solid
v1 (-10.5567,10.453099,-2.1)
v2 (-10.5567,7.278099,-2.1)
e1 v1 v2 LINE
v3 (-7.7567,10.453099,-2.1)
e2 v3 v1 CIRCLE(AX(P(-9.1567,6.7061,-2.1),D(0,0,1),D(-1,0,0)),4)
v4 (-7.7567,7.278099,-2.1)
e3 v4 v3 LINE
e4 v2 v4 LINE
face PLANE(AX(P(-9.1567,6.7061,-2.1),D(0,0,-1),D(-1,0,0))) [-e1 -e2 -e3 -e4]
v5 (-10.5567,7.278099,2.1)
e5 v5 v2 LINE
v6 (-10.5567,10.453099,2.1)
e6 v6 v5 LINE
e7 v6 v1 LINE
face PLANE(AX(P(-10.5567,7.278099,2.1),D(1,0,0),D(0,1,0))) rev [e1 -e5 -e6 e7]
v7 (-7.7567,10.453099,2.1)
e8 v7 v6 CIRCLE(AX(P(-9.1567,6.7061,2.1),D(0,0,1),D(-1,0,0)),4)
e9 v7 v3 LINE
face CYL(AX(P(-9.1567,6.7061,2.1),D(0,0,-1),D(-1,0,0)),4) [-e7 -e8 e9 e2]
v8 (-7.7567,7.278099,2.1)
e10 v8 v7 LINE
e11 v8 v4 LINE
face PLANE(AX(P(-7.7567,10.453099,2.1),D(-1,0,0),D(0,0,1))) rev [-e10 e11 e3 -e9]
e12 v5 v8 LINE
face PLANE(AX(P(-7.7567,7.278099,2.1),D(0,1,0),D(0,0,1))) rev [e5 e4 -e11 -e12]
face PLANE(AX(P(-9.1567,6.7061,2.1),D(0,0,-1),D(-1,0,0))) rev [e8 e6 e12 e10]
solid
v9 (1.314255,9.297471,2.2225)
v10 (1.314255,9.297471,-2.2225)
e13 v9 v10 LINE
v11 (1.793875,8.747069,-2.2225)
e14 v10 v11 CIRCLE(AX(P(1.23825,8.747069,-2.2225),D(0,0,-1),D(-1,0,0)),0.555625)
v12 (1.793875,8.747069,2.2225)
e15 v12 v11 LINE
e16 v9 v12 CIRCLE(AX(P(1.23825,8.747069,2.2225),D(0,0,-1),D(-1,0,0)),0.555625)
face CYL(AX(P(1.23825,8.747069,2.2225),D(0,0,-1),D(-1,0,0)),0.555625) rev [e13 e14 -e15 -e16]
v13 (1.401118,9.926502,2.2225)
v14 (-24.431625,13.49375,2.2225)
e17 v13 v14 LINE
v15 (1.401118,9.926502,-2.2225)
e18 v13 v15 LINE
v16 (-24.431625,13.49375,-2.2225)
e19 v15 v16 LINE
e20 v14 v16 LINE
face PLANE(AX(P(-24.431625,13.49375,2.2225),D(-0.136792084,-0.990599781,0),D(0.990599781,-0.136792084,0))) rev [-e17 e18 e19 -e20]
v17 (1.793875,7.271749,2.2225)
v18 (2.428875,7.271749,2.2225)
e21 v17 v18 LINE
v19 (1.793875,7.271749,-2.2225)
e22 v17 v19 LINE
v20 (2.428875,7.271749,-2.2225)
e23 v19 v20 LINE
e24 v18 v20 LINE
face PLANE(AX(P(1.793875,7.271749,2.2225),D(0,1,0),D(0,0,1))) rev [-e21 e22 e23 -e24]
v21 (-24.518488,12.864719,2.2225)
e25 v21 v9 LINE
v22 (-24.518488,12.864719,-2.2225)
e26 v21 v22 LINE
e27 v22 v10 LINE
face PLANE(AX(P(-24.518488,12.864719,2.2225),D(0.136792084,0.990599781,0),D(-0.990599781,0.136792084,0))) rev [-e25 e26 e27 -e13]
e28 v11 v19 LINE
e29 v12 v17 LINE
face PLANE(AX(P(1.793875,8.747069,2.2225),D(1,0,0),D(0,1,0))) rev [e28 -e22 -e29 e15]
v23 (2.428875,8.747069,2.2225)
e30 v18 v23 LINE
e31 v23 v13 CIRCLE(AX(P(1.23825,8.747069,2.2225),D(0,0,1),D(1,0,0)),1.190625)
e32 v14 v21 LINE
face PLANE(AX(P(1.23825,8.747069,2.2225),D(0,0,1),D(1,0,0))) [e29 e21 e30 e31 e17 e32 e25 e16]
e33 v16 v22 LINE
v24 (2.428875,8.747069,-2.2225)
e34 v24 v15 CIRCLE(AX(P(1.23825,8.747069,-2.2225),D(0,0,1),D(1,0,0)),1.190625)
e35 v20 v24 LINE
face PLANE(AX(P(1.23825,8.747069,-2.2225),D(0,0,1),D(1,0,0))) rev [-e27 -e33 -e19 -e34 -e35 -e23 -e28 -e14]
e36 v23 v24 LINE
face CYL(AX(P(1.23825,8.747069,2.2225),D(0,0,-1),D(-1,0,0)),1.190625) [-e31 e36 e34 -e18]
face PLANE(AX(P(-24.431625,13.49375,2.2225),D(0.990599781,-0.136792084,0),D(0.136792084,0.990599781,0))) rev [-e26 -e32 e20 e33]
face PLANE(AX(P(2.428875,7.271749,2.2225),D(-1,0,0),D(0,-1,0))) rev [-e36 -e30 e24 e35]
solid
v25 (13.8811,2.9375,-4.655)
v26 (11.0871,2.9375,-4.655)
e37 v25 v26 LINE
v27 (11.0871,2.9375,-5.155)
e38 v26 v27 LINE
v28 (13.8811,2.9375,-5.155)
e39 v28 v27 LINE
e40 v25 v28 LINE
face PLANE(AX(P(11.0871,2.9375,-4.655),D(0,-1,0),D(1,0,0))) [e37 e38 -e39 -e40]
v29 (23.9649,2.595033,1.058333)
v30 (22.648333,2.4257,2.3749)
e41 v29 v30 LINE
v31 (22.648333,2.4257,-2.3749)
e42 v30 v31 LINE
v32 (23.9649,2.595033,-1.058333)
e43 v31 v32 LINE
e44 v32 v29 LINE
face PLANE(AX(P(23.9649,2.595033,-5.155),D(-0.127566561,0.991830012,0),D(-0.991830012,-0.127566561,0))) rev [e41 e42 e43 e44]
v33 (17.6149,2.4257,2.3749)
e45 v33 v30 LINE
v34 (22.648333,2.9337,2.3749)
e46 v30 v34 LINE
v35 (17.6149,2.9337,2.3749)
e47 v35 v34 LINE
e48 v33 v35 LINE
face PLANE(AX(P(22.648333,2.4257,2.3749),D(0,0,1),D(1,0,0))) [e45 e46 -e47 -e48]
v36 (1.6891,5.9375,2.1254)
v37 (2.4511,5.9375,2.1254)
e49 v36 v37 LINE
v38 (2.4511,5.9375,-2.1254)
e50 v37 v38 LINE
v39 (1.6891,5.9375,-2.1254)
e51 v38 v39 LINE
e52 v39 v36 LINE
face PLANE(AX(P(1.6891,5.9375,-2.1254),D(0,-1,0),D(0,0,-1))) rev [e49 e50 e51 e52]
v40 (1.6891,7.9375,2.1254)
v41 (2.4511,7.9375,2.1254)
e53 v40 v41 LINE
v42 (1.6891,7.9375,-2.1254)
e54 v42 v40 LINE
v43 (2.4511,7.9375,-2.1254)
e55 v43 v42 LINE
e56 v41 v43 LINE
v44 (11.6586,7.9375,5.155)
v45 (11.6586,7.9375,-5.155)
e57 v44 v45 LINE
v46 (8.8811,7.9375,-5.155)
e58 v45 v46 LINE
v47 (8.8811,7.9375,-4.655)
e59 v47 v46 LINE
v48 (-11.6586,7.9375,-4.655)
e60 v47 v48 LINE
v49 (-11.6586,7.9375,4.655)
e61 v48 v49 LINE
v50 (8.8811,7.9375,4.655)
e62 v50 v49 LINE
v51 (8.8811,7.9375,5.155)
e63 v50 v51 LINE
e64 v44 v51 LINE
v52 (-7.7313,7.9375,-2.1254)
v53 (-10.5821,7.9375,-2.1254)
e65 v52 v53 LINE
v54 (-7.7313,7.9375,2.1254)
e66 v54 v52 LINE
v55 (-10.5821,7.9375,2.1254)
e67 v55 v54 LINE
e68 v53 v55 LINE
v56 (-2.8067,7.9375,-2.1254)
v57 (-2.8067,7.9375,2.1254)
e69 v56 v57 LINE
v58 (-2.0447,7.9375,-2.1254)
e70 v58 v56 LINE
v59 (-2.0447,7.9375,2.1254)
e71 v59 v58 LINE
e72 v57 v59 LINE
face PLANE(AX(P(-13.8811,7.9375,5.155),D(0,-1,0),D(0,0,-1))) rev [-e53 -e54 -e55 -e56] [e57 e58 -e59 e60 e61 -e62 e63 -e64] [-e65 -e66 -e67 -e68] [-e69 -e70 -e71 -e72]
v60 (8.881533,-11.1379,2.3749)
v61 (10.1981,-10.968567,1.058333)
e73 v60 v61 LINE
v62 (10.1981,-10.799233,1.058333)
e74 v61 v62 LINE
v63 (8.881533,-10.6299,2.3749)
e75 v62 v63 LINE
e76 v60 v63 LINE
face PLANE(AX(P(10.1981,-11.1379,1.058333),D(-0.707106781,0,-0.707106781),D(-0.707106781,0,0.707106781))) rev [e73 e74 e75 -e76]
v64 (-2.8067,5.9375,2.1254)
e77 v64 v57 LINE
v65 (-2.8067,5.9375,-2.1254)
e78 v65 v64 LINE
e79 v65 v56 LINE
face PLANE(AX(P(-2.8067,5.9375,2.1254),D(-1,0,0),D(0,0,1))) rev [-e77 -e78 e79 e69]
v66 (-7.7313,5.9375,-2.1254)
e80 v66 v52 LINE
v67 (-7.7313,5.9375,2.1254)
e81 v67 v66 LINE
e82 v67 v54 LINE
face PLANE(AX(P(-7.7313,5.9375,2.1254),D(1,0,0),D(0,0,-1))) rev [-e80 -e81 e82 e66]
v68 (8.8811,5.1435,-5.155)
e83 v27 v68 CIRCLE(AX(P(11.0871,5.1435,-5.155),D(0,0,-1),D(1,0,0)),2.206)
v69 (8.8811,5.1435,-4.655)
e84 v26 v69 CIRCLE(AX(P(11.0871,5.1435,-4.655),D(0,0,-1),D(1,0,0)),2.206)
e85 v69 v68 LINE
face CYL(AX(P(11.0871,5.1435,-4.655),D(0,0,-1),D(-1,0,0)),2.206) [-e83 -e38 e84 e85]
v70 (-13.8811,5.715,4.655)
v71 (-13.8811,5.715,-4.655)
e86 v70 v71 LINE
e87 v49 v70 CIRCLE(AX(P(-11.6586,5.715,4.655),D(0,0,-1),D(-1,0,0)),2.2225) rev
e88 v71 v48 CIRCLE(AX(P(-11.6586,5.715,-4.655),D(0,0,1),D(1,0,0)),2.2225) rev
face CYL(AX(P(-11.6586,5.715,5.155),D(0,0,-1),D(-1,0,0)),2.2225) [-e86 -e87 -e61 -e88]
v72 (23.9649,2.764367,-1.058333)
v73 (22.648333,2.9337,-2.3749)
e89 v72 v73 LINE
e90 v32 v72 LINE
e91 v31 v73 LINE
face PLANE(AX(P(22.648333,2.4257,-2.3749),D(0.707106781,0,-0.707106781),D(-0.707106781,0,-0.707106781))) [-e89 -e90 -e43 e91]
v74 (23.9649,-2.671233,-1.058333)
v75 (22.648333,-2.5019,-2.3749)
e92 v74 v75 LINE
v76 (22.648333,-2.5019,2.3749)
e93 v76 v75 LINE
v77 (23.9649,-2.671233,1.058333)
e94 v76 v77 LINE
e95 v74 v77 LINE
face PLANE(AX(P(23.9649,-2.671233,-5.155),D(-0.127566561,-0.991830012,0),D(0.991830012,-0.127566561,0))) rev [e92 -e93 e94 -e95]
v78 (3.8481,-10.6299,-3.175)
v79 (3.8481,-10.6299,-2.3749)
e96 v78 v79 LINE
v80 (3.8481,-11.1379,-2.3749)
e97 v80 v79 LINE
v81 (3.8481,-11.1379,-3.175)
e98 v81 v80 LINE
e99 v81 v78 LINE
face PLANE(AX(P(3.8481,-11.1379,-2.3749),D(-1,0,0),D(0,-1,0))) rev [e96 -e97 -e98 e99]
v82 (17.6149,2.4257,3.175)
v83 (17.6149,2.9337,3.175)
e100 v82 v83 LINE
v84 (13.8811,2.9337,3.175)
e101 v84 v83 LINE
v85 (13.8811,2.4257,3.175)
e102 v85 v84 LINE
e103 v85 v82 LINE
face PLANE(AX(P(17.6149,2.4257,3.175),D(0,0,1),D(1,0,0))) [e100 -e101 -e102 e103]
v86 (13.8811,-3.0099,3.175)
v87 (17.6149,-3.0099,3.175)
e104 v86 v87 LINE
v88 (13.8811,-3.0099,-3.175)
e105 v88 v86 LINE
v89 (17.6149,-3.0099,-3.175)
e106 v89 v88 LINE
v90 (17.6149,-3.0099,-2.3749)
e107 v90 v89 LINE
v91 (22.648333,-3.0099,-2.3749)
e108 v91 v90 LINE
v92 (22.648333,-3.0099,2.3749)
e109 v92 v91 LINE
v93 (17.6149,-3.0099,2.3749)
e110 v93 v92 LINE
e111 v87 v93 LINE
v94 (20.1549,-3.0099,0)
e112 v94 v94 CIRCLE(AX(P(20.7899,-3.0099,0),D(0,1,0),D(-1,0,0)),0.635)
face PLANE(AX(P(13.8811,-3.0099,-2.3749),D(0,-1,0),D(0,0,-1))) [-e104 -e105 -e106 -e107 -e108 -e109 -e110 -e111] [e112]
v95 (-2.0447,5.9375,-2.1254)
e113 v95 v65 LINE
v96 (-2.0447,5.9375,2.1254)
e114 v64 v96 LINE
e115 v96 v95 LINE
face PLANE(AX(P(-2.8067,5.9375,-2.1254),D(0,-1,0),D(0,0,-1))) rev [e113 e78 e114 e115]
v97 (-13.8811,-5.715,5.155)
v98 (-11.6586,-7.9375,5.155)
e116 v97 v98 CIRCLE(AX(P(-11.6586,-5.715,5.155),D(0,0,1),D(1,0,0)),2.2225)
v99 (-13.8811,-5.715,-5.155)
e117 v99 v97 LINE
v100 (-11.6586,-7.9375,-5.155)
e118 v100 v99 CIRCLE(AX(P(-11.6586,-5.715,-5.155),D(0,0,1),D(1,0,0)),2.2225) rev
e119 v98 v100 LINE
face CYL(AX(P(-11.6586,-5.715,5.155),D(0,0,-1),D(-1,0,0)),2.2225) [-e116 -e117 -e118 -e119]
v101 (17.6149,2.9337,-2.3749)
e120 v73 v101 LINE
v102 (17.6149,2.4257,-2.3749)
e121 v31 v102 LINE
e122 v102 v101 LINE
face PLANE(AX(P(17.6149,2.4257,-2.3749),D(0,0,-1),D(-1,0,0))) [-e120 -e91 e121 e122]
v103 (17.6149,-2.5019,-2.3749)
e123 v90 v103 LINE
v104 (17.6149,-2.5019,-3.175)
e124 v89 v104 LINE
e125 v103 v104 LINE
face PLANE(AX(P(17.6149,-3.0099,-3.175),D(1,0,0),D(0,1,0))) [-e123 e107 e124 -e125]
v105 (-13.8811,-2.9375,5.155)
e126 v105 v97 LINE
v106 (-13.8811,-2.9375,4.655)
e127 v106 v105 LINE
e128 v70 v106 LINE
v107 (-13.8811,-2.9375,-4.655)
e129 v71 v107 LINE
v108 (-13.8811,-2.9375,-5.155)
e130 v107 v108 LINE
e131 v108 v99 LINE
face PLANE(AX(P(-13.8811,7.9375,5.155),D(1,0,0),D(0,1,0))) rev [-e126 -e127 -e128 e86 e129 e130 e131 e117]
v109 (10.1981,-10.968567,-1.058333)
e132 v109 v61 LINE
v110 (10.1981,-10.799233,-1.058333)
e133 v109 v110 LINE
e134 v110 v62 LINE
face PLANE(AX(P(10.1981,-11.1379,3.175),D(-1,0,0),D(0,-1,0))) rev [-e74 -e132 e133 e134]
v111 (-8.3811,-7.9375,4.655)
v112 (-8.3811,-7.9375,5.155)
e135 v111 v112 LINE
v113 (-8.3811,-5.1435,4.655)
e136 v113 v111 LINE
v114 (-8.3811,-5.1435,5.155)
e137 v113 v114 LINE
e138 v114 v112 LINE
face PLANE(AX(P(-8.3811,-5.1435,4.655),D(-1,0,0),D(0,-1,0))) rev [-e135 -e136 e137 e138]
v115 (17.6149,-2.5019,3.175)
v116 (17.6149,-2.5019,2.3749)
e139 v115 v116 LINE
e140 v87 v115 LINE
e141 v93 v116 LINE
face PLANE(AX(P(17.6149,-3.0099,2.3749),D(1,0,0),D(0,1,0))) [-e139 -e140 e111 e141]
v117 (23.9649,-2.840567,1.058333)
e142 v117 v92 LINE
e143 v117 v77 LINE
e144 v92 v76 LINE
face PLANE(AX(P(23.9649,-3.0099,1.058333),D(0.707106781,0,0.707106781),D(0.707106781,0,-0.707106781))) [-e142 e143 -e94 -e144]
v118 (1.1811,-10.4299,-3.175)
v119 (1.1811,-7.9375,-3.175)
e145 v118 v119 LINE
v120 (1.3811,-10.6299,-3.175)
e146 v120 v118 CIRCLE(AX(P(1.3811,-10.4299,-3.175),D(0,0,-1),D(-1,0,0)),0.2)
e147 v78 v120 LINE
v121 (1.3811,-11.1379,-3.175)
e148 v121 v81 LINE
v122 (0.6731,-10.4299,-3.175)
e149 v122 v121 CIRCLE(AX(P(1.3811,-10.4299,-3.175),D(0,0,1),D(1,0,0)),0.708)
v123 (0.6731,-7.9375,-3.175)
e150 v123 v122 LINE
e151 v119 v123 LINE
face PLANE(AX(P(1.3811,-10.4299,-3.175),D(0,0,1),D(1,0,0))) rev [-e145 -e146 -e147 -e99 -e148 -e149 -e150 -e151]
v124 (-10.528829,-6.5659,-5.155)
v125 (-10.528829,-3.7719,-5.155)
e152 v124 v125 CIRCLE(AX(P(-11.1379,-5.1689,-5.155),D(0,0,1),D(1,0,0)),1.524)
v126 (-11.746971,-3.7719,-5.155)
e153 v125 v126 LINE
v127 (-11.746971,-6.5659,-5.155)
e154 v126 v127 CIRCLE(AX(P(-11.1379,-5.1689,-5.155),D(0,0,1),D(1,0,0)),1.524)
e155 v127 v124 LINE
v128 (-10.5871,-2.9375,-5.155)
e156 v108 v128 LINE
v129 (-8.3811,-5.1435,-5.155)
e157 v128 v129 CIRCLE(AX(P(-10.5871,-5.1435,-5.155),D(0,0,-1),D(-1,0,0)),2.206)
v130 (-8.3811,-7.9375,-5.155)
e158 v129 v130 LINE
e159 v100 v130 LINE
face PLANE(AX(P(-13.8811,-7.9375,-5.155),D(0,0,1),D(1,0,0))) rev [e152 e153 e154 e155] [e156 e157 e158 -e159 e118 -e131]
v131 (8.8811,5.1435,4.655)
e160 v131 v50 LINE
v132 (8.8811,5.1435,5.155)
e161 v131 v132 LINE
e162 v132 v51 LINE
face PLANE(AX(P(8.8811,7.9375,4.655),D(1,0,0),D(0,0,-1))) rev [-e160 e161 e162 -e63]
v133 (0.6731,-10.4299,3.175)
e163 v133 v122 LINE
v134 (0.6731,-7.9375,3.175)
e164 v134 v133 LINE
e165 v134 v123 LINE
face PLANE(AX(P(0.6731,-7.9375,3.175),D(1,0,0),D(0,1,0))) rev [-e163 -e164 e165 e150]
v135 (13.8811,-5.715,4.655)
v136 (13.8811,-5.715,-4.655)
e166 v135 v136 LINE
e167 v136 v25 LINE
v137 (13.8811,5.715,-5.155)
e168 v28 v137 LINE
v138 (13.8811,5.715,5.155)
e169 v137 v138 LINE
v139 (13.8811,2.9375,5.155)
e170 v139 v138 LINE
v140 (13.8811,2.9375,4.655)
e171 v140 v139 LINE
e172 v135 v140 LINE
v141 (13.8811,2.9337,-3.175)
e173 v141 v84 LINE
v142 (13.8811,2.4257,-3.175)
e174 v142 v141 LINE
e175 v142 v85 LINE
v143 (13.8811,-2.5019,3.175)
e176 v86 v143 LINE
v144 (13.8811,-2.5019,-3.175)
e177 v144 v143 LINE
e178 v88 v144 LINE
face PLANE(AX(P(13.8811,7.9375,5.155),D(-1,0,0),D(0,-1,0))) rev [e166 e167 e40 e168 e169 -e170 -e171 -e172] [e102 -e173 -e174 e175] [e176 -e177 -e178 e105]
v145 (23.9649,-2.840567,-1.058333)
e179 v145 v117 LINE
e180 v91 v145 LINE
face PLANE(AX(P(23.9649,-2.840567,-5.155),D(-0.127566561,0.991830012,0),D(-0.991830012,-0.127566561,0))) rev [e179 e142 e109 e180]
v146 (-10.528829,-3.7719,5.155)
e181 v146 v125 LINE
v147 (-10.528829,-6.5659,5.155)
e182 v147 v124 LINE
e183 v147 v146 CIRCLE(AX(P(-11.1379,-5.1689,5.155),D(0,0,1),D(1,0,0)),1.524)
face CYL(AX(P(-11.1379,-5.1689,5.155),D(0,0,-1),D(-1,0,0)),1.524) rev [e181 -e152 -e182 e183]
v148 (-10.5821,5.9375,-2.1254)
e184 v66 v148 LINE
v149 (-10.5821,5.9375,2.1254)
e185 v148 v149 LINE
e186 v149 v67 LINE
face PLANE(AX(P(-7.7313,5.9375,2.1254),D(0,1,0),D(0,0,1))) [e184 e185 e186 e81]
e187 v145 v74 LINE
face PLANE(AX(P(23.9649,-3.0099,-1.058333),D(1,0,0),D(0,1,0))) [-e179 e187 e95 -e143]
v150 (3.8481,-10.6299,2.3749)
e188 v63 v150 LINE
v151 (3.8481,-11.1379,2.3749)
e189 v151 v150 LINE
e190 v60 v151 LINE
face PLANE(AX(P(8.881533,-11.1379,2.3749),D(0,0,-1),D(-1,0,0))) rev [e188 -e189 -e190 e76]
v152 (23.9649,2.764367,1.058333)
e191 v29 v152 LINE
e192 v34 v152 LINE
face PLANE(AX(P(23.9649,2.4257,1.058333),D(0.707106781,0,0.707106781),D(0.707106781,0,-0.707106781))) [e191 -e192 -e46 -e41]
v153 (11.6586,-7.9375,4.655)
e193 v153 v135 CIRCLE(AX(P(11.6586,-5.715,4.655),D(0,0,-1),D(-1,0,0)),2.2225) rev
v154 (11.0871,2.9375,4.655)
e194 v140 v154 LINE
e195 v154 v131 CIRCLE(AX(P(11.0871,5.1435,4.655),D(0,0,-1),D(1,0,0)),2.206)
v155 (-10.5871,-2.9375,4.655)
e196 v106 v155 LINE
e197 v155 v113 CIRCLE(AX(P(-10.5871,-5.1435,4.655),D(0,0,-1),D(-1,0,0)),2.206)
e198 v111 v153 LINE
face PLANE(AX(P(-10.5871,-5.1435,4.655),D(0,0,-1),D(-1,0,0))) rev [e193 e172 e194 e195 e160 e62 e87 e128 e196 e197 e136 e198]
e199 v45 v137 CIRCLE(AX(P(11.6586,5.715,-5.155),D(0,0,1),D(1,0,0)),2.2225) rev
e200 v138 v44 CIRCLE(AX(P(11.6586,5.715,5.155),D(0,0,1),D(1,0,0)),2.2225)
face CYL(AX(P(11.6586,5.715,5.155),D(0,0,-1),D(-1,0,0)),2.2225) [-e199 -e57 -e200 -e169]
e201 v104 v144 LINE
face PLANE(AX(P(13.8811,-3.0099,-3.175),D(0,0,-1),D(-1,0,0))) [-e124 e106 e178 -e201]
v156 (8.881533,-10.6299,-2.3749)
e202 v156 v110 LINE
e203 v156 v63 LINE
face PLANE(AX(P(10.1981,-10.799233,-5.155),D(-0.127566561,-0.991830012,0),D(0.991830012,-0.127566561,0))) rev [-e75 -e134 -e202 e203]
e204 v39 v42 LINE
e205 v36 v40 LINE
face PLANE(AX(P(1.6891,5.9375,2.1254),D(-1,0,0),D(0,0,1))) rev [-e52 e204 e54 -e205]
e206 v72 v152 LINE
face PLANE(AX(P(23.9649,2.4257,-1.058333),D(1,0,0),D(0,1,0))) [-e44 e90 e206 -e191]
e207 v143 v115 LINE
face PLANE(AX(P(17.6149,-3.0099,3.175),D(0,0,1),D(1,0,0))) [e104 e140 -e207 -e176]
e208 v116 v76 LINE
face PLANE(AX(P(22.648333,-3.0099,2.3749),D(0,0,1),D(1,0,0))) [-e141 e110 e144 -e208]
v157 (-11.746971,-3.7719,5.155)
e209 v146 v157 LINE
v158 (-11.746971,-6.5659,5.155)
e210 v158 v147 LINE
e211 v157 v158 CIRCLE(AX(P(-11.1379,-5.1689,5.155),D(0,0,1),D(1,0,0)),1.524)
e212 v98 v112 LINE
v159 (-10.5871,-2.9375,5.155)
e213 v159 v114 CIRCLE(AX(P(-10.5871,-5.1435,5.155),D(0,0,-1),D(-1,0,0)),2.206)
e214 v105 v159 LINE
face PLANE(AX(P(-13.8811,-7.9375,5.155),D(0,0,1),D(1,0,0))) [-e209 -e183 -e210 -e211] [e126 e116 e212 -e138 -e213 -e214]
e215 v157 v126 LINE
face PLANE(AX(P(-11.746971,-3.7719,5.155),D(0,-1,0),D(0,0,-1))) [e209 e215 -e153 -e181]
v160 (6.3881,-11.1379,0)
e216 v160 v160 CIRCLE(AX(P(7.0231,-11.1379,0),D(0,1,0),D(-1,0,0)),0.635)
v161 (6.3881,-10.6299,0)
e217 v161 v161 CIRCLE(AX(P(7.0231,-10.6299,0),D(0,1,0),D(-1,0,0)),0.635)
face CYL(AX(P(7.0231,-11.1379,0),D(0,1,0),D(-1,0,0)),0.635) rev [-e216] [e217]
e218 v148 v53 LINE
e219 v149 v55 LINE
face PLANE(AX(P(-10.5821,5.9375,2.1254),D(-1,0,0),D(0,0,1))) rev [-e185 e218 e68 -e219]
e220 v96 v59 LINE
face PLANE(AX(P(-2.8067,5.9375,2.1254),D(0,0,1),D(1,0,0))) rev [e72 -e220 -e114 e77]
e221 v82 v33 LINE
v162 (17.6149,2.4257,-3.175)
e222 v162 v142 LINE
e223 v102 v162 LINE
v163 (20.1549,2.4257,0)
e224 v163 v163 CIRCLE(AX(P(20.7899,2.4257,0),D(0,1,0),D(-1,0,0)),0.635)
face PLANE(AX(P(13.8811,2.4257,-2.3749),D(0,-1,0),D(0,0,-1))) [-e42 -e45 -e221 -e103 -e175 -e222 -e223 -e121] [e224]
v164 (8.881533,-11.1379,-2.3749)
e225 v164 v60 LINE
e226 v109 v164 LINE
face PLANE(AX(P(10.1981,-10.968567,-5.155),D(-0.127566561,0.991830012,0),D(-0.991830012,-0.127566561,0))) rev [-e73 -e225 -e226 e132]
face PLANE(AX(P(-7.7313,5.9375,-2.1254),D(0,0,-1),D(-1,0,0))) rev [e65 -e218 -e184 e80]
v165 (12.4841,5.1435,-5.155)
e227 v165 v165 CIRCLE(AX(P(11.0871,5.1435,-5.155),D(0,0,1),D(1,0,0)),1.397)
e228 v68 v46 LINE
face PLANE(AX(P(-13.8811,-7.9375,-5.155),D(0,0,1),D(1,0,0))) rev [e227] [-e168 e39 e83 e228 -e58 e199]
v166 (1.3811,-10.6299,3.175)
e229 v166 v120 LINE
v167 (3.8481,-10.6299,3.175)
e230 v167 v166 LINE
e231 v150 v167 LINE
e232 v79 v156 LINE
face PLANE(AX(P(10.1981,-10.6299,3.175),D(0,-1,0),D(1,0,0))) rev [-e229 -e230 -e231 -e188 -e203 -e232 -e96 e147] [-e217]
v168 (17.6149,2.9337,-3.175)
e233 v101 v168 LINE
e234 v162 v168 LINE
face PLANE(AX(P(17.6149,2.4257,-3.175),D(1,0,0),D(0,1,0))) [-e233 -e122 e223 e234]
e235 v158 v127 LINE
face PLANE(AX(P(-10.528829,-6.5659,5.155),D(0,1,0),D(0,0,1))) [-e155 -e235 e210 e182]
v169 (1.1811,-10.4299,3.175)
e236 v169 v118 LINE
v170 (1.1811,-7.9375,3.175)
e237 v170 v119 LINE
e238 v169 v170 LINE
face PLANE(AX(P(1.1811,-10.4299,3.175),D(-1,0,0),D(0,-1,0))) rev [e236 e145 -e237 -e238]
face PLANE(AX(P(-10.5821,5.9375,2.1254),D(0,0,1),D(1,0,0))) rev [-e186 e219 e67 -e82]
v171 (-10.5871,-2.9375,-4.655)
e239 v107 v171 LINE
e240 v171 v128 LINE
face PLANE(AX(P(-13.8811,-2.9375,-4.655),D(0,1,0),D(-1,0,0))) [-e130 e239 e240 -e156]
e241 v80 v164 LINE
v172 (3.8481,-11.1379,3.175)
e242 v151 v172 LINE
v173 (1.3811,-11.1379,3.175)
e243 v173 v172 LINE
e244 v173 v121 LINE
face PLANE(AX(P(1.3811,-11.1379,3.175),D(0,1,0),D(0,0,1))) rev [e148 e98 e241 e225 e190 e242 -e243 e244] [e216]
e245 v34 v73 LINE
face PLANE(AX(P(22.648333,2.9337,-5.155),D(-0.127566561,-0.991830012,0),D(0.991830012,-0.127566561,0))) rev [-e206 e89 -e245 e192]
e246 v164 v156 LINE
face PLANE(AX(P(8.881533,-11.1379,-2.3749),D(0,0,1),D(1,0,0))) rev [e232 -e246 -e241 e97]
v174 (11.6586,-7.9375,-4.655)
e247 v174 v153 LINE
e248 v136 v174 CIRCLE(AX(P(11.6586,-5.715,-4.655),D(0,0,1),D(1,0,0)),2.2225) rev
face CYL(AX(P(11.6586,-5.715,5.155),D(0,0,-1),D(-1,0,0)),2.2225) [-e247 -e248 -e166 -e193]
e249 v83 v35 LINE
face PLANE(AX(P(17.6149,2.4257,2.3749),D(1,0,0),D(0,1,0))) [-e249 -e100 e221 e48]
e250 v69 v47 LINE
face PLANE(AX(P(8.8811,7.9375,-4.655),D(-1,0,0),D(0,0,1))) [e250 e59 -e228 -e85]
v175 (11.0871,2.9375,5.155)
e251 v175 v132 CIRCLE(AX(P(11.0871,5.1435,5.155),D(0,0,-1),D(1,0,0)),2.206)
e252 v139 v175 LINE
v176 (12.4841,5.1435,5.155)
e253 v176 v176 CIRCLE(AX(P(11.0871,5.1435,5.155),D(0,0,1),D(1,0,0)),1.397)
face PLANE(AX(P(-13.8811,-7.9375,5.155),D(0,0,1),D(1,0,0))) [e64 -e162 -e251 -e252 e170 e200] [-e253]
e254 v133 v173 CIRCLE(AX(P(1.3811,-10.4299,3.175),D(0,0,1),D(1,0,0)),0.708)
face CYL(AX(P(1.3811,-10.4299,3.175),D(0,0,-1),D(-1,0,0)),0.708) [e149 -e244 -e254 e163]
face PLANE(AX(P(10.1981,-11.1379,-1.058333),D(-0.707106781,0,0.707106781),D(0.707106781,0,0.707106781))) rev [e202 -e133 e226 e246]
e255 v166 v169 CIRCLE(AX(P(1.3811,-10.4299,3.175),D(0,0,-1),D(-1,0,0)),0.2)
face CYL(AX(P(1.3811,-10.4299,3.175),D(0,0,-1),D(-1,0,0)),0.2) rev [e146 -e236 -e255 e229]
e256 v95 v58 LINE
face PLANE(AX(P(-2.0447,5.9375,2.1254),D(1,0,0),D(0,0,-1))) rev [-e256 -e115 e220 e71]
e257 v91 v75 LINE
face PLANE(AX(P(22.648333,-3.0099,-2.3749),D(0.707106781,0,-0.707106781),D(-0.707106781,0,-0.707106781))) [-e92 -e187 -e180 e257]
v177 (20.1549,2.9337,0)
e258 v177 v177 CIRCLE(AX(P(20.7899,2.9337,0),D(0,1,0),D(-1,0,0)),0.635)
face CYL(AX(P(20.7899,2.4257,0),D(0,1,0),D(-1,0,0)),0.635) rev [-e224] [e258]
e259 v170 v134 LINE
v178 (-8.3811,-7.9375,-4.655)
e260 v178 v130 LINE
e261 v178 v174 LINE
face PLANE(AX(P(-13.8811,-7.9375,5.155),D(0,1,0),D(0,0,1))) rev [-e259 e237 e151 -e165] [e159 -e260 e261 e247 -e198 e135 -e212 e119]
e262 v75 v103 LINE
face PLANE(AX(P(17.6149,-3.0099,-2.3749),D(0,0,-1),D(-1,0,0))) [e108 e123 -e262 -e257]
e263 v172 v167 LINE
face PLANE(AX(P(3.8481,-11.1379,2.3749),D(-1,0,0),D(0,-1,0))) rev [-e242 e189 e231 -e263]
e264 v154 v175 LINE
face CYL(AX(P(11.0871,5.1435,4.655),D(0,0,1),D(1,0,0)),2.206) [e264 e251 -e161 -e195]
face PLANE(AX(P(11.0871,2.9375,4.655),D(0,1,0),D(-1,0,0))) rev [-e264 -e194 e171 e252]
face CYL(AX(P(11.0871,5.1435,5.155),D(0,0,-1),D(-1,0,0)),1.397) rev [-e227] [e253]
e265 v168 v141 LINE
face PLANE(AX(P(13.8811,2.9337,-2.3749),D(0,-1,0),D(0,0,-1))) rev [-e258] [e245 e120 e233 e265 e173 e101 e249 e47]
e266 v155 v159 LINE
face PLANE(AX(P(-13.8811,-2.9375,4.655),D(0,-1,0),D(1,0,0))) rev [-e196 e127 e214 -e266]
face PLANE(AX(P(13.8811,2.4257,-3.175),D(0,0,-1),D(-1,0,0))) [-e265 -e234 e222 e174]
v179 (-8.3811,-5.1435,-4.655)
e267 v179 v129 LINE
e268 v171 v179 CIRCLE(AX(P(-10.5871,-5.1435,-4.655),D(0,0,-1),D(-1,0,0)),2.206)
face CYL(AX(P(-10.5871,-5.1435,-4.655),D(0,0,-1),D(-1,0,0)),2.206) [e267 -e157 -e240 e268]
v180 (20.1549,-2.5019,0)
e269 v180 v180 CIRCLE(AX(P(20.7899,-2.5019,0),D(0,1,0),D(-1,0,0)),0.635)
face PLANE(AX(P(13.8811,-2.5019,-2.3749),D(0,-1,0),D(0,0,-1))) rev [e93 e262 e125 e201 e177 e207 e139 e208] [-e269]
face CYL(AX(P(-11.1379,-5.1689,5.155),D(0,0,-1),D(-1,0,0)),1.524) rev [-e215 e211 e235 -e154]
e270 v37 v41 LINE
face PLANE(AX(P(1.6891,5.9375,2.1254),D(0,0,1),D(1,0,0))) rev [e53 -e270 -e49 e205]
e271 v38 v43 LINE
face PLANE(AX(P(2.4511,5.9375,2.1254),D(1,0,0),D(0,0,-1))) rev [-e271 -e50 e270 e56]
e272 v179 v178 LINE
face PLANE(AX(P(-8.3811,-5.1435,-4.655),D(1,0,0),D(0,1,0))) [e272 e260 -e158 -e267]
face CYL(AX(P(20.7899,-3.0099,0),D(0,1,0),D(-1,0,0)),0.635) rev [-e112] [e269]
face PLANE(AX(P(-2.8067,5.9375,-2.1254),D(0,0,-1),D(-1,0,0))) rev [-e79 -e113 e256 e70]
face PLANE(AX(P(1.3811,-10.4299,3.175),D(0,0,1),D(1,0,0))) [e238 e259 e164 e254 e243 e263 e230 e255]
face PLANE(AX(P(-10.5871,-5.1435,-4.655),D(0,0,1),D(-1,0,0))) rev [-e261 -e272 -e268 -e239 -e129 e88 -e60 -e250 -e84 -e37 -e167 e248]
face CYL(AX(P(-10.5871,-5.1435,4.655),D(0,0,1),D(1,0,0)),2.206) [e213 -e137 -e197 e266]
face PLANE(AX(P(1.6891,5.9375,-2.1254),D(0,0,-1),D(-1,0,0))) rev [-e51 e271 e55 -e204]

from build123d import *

# Parameters (mm, degrees)
SKETCH1_W               = 27.7622
SKETCH1_H               = 15.875
SKETCH1_R               = 1.397
EXTRUDE1_DEPTH          = 5.155
FILLET1_R               = 2.2225
EXTRUDE2_DEPTH          = 2.1
SKETCH3_W               = 2.8508
SKETCH3_H               = 4.2508
SKETCH3_W_2             = 0.762
CUT_EXTRUDE1_DEPTH      = 2
CUT_EXTRUDE2_DEPTH      = 0.5
EXTRUDE3_DEPTH          = 3.175
SKETCH6_R               = 0.635
CUT_EXTRUDE3_DEPTH      = 26.970827061
EXTRUDE4_START          = -5.0038
SKETCH8_R               = 0.635
EXTRUDE4_DEPTH          = 0.508
LPATTERN1_COUNT         = 2
LPATTERN1_PITCH         = 5.4356
CUT_EXTRUDE4_DEPTH      = 27.924770629
CUT_EXTRUDE4_DEPTH_BACK = 27.924770629
LEVER2A_START           = -2.2225
LEVER2A_DEPTH           = 4.445


# Read off the part's stored shape, not the designer's step: Lever2a
with BuildPart() as part:
    # Sketch1 → Extrude1 (new, symmetric)
    with BuildSketch(Plane.XY):
        Rectangle(SKETCH1_W, SKETCH1_H)
        with Locations((11.0871, 5.1435)):
            Circle(SKETCH1_R, mode=Mode.SUBTRACT)
        with BuildLine():
            Line((-11.746970603, -3.7719), (-10.528829397, -3.7719))
            ThreePointArc((-10.528829397, -3.7719), (-9.6139, -5.1689), (-10.528829397, -6.5659))
            Line((-10.528829397, -6.5659), (-11.746970603, -6.5659))
            ThreePointArc((-11.746970603, -6.5659), (-12.6619, -5.1689), (-11.746970603, -3.7719))
        make_face(mode=Mode.SUBTRACT)
    extrude(amount=EXTRUDE1_DEPTH, both=True)

    # Fillet1
    fillet1_edges = [part.edges().sort_by_distance(p)[0] for p in [
        (-13.8811, 7.9375, 0),
        (13.8811, 7.9375, 0),
        (13.8811, -7.9375, 0),
        (-13.8811, -7.9375, 0),
    ]]
    fillet(fillet1_edges, radius=FILLET1_R)

    # Sketch3 → Cut-Extrude1 (cut)
    with BuildSketch(Plane(origin=(0, 7.9375, 0), x_dir=(-1, 0, 0), z_dir=(0, 1, 0))):
        with Locations((9.1567, 0)):
            Rectangle(SKETCH3_W, SKETCH3_H)
        with Locations((2.4257, 0)):
            Rectangle(SKETCH3_W_2, SKETCH3_H)
        with Locations((-2.0701, 0)):
            Rectangle(SKETCH3_W_2, SKETCH3_H)
    extrude(amount=-CUT_EXTRUDE1_DEPTH, mode=Mode.SUBTRACT)

    # Sketch4 → Cut-Extrude2 (cut)
    with BuildSketch(Plane.XY.offset(5.155)):
        with BuildLine():
            Line((-8.3811, -7.9375), (13.8811, -7.9375))
            Line((13.8811, -7.9375), (13.8811, 2.9375))
            Line((13.8811, 2.9375), (11.0871, 2.9375))
            ThreePointArc((11.0871, 2.9375), (9.527222441, 3.583622441), (8.8811, 5.1435))
            Line((8.8811, 5.1435), (8.8811, 7.9375))
            Line((8.8811, 7.9375), (-13.8811, 7.9375))
            Line((-13.8811, 7.9375), (-13.8811, -2.9375))
            Line((-13.8811, -2.9375), (-10.5871, -2.9375))
            ThreePointArc((-10.5871, -2.9375), (-9.027222441, -3.583622441), (-8.3811, -5.1435))
            Line((-8.3811, -5.1435), (-8.3811, -7.9375))
        make_face()
    cut_extrude2 = extrude(amount=-CUT_EXTRUDE2_DEPTH, mode=Mode.SUBTRACT)

    # Mirror1: Cut-Extrude2 across plane
    add(cut_extrude2.mirror(Plane.XY), mode=Mode.SUBTRACT)

    # Sketch5 → Extrude3 (add, symmetric)
    with BuildSketch(Plane.XY):
        with BuildLine():
            Line((0.6731, -7.9375), (0.6731, -10.4299))
            ThreePointArc((0.6731, -10.4299), (0.880468399, -10.930531601), (1.3811, -11.1379))
            Line((1.3811, -11.1379), (10.1981, -11.1379))
            Line((10.1981, -11.1379), (10.1981, -10.6299))
            Line((10.1981, -10.6299), (1.3811, -10.6299))
            ThreePointArc((1.3811, -10.6299), (1.239678644, -10.571321356), (1.1811, -10.4299))
            Line((1.1811, -10.4299), (1.1811, -7.9375))
            Line((1.1811, -7.9375), (0.6731, -7.9375))
        make_face()
    extrude(amount=EXTRUDE3_DEPTH, both=True)

    # Sketch6 → Cut-Extrude3 (cut, through all)
    with BuildSketch(Plane(origin=(0, -10.6299, 0), x_dir=(-1, 0, 0), z_dir=(0, 1, 0))):
        with Locations((-7.0231, 0)):
            Circle(SKETCH6_R)
        Polygon((-10.1981, 1.058333333), (-8.881533333, 2.3749), (-3.8481, 2.3749), (-3.8481, 3.175), (-10.1981, 3.175), align=None)
        Polygon((-10.1981, -3.175), (-10.1981, -1.058333333), (-8.881533333, -2.3749), (-3.8481, -2.3749), (-3.8481, -3.175), align=None)
    extrude(amount=-CUT_EXTRUDE3_DEPTH, mode=Mode.SUBTRACT)

    # Sketch8 → Extrude4 (add)
    with BuildSketch(Plane(origin=(0, 7.9375, 0), x_dir=(-1, 0, 0), z_dir=(0, 1, 0)).offset(EXTRUDE4_START)):
        Polygon((-13.8811, -3.175), (-17.6149, -3.175), (-17.6149, -2.3749), (-22.648333333, -2.3749), (-23.9649, -1.058333333), (-23.9649, 1.058333333), (-22.648333333, 2.3749), (-17.6149, 2.3749), (-17.6149, 3.175), (-13.8811, 3.175), align=None)
        with Locations((-20.7899, 0)):
            Circle(SKETCH8_R, mode=Mode.SUBTRACT)
    extrude4 = extrude(amount=-EXTRUDE4_DEPTH)

    # LPattern1: Extrude4 ×2
    with Locations(*[(0, -i * LPATTERN1_PITCH, 0) for i in range(1, LPATTERN1_COUNT)]):
        add(extrude4)

    # Sketch7 → Cut-Extrude4 (cut, two sides: drawn at the far end of the back side and taken through both)
    with BuildSketch(Plane.XY.offset(-CUT_EXTRUDE4_DEPTH_BACK)):
        Polygon((8.881533333, -10.6299), (10.1981, -10.6299), (10.1981, -10.799233333), align=None)
        Polygon((8.881533333, -11.1379), (10.1981, -11.1379), (10.1981, -10.968566667), align=None)
        Polygon((22.648333333, 2.9337), (23.9649, 2.764366667), (23.9649, 2.9337), align=None)
        Polygon((23.9649, 2.595033333), (22.648333333, 2.4257), (23.9649, 2.4257), align=None)
        Polygon((22.648333333, -2.5019), (23.9649, -2.5019), (23.9649, -2.671233333), align=None)
        Polygon((23.9649, -2.840566667), (22.648333333, -3.0099), (23.9649, -3.0099), align=None)
    extrude(amount=CUT_EXTRUDE4_DEPTH + CUT_EXTRUDE4_DEPTH_BACK, mode=Mode.SUBTRACT)


with BuildPart() as body_2:
    # Sketch2 → Extrude2 (new, symmetric)
    with BuildSketch(Plane.XY):
        with BuildLine():
            Line((-10.5567, 7.278098799), (-10.5567, 10.453098799))
            ThreePointArc((-10.5567, 10.453098799), (-9.1567, 10.7061), (-7.7567, 10.453098799))
            Line((-7.7567, 10.453098799), (-7.7567, 7.278098799))
            Line((-7.7567, 7.278098799), (-10.5567, 7.278098799))
        make_face()
    extrude(amount=EXTRUDE2_DEPTH, both=True)


with BuildPart() as body_3:
    # Lever2a outline → Lever2a (new body)
    with BuildSketch(Plane.XY.offset(LEVER2A_START)):
        with BuildLine():
            Line((1.793875, 7.271748799), (2.428875, 7.271748799))
            Line((2.428875, 7.271748799), (2.428875, 8.747069475))
            ThreePointArc((2.428875, 8.747069475), (2.135886533, 9.529269286), (1.401118075, 9.926502339))
            Line((1.401118075, 9.926502339), (-24.431625, 13.49375))
            Line((-24.431625, 13.49375), (-24.518487973, 12.864719139))
            Line((-24.518487973, 12.864719139), (1.314255101, 9.297471479))
            ThreePointArc((1.314255101, 9.297471479), (1.657147049, 9.112096054), (1.793875, 8.747069475))
            Line((1.793875, 8.747069475), (1.793875, 7.271748799))
        make_face()
    extrude(amount=LEVER2A_DEPTH)


solid = Compound([part.part, body_2.part, body_3.part])
